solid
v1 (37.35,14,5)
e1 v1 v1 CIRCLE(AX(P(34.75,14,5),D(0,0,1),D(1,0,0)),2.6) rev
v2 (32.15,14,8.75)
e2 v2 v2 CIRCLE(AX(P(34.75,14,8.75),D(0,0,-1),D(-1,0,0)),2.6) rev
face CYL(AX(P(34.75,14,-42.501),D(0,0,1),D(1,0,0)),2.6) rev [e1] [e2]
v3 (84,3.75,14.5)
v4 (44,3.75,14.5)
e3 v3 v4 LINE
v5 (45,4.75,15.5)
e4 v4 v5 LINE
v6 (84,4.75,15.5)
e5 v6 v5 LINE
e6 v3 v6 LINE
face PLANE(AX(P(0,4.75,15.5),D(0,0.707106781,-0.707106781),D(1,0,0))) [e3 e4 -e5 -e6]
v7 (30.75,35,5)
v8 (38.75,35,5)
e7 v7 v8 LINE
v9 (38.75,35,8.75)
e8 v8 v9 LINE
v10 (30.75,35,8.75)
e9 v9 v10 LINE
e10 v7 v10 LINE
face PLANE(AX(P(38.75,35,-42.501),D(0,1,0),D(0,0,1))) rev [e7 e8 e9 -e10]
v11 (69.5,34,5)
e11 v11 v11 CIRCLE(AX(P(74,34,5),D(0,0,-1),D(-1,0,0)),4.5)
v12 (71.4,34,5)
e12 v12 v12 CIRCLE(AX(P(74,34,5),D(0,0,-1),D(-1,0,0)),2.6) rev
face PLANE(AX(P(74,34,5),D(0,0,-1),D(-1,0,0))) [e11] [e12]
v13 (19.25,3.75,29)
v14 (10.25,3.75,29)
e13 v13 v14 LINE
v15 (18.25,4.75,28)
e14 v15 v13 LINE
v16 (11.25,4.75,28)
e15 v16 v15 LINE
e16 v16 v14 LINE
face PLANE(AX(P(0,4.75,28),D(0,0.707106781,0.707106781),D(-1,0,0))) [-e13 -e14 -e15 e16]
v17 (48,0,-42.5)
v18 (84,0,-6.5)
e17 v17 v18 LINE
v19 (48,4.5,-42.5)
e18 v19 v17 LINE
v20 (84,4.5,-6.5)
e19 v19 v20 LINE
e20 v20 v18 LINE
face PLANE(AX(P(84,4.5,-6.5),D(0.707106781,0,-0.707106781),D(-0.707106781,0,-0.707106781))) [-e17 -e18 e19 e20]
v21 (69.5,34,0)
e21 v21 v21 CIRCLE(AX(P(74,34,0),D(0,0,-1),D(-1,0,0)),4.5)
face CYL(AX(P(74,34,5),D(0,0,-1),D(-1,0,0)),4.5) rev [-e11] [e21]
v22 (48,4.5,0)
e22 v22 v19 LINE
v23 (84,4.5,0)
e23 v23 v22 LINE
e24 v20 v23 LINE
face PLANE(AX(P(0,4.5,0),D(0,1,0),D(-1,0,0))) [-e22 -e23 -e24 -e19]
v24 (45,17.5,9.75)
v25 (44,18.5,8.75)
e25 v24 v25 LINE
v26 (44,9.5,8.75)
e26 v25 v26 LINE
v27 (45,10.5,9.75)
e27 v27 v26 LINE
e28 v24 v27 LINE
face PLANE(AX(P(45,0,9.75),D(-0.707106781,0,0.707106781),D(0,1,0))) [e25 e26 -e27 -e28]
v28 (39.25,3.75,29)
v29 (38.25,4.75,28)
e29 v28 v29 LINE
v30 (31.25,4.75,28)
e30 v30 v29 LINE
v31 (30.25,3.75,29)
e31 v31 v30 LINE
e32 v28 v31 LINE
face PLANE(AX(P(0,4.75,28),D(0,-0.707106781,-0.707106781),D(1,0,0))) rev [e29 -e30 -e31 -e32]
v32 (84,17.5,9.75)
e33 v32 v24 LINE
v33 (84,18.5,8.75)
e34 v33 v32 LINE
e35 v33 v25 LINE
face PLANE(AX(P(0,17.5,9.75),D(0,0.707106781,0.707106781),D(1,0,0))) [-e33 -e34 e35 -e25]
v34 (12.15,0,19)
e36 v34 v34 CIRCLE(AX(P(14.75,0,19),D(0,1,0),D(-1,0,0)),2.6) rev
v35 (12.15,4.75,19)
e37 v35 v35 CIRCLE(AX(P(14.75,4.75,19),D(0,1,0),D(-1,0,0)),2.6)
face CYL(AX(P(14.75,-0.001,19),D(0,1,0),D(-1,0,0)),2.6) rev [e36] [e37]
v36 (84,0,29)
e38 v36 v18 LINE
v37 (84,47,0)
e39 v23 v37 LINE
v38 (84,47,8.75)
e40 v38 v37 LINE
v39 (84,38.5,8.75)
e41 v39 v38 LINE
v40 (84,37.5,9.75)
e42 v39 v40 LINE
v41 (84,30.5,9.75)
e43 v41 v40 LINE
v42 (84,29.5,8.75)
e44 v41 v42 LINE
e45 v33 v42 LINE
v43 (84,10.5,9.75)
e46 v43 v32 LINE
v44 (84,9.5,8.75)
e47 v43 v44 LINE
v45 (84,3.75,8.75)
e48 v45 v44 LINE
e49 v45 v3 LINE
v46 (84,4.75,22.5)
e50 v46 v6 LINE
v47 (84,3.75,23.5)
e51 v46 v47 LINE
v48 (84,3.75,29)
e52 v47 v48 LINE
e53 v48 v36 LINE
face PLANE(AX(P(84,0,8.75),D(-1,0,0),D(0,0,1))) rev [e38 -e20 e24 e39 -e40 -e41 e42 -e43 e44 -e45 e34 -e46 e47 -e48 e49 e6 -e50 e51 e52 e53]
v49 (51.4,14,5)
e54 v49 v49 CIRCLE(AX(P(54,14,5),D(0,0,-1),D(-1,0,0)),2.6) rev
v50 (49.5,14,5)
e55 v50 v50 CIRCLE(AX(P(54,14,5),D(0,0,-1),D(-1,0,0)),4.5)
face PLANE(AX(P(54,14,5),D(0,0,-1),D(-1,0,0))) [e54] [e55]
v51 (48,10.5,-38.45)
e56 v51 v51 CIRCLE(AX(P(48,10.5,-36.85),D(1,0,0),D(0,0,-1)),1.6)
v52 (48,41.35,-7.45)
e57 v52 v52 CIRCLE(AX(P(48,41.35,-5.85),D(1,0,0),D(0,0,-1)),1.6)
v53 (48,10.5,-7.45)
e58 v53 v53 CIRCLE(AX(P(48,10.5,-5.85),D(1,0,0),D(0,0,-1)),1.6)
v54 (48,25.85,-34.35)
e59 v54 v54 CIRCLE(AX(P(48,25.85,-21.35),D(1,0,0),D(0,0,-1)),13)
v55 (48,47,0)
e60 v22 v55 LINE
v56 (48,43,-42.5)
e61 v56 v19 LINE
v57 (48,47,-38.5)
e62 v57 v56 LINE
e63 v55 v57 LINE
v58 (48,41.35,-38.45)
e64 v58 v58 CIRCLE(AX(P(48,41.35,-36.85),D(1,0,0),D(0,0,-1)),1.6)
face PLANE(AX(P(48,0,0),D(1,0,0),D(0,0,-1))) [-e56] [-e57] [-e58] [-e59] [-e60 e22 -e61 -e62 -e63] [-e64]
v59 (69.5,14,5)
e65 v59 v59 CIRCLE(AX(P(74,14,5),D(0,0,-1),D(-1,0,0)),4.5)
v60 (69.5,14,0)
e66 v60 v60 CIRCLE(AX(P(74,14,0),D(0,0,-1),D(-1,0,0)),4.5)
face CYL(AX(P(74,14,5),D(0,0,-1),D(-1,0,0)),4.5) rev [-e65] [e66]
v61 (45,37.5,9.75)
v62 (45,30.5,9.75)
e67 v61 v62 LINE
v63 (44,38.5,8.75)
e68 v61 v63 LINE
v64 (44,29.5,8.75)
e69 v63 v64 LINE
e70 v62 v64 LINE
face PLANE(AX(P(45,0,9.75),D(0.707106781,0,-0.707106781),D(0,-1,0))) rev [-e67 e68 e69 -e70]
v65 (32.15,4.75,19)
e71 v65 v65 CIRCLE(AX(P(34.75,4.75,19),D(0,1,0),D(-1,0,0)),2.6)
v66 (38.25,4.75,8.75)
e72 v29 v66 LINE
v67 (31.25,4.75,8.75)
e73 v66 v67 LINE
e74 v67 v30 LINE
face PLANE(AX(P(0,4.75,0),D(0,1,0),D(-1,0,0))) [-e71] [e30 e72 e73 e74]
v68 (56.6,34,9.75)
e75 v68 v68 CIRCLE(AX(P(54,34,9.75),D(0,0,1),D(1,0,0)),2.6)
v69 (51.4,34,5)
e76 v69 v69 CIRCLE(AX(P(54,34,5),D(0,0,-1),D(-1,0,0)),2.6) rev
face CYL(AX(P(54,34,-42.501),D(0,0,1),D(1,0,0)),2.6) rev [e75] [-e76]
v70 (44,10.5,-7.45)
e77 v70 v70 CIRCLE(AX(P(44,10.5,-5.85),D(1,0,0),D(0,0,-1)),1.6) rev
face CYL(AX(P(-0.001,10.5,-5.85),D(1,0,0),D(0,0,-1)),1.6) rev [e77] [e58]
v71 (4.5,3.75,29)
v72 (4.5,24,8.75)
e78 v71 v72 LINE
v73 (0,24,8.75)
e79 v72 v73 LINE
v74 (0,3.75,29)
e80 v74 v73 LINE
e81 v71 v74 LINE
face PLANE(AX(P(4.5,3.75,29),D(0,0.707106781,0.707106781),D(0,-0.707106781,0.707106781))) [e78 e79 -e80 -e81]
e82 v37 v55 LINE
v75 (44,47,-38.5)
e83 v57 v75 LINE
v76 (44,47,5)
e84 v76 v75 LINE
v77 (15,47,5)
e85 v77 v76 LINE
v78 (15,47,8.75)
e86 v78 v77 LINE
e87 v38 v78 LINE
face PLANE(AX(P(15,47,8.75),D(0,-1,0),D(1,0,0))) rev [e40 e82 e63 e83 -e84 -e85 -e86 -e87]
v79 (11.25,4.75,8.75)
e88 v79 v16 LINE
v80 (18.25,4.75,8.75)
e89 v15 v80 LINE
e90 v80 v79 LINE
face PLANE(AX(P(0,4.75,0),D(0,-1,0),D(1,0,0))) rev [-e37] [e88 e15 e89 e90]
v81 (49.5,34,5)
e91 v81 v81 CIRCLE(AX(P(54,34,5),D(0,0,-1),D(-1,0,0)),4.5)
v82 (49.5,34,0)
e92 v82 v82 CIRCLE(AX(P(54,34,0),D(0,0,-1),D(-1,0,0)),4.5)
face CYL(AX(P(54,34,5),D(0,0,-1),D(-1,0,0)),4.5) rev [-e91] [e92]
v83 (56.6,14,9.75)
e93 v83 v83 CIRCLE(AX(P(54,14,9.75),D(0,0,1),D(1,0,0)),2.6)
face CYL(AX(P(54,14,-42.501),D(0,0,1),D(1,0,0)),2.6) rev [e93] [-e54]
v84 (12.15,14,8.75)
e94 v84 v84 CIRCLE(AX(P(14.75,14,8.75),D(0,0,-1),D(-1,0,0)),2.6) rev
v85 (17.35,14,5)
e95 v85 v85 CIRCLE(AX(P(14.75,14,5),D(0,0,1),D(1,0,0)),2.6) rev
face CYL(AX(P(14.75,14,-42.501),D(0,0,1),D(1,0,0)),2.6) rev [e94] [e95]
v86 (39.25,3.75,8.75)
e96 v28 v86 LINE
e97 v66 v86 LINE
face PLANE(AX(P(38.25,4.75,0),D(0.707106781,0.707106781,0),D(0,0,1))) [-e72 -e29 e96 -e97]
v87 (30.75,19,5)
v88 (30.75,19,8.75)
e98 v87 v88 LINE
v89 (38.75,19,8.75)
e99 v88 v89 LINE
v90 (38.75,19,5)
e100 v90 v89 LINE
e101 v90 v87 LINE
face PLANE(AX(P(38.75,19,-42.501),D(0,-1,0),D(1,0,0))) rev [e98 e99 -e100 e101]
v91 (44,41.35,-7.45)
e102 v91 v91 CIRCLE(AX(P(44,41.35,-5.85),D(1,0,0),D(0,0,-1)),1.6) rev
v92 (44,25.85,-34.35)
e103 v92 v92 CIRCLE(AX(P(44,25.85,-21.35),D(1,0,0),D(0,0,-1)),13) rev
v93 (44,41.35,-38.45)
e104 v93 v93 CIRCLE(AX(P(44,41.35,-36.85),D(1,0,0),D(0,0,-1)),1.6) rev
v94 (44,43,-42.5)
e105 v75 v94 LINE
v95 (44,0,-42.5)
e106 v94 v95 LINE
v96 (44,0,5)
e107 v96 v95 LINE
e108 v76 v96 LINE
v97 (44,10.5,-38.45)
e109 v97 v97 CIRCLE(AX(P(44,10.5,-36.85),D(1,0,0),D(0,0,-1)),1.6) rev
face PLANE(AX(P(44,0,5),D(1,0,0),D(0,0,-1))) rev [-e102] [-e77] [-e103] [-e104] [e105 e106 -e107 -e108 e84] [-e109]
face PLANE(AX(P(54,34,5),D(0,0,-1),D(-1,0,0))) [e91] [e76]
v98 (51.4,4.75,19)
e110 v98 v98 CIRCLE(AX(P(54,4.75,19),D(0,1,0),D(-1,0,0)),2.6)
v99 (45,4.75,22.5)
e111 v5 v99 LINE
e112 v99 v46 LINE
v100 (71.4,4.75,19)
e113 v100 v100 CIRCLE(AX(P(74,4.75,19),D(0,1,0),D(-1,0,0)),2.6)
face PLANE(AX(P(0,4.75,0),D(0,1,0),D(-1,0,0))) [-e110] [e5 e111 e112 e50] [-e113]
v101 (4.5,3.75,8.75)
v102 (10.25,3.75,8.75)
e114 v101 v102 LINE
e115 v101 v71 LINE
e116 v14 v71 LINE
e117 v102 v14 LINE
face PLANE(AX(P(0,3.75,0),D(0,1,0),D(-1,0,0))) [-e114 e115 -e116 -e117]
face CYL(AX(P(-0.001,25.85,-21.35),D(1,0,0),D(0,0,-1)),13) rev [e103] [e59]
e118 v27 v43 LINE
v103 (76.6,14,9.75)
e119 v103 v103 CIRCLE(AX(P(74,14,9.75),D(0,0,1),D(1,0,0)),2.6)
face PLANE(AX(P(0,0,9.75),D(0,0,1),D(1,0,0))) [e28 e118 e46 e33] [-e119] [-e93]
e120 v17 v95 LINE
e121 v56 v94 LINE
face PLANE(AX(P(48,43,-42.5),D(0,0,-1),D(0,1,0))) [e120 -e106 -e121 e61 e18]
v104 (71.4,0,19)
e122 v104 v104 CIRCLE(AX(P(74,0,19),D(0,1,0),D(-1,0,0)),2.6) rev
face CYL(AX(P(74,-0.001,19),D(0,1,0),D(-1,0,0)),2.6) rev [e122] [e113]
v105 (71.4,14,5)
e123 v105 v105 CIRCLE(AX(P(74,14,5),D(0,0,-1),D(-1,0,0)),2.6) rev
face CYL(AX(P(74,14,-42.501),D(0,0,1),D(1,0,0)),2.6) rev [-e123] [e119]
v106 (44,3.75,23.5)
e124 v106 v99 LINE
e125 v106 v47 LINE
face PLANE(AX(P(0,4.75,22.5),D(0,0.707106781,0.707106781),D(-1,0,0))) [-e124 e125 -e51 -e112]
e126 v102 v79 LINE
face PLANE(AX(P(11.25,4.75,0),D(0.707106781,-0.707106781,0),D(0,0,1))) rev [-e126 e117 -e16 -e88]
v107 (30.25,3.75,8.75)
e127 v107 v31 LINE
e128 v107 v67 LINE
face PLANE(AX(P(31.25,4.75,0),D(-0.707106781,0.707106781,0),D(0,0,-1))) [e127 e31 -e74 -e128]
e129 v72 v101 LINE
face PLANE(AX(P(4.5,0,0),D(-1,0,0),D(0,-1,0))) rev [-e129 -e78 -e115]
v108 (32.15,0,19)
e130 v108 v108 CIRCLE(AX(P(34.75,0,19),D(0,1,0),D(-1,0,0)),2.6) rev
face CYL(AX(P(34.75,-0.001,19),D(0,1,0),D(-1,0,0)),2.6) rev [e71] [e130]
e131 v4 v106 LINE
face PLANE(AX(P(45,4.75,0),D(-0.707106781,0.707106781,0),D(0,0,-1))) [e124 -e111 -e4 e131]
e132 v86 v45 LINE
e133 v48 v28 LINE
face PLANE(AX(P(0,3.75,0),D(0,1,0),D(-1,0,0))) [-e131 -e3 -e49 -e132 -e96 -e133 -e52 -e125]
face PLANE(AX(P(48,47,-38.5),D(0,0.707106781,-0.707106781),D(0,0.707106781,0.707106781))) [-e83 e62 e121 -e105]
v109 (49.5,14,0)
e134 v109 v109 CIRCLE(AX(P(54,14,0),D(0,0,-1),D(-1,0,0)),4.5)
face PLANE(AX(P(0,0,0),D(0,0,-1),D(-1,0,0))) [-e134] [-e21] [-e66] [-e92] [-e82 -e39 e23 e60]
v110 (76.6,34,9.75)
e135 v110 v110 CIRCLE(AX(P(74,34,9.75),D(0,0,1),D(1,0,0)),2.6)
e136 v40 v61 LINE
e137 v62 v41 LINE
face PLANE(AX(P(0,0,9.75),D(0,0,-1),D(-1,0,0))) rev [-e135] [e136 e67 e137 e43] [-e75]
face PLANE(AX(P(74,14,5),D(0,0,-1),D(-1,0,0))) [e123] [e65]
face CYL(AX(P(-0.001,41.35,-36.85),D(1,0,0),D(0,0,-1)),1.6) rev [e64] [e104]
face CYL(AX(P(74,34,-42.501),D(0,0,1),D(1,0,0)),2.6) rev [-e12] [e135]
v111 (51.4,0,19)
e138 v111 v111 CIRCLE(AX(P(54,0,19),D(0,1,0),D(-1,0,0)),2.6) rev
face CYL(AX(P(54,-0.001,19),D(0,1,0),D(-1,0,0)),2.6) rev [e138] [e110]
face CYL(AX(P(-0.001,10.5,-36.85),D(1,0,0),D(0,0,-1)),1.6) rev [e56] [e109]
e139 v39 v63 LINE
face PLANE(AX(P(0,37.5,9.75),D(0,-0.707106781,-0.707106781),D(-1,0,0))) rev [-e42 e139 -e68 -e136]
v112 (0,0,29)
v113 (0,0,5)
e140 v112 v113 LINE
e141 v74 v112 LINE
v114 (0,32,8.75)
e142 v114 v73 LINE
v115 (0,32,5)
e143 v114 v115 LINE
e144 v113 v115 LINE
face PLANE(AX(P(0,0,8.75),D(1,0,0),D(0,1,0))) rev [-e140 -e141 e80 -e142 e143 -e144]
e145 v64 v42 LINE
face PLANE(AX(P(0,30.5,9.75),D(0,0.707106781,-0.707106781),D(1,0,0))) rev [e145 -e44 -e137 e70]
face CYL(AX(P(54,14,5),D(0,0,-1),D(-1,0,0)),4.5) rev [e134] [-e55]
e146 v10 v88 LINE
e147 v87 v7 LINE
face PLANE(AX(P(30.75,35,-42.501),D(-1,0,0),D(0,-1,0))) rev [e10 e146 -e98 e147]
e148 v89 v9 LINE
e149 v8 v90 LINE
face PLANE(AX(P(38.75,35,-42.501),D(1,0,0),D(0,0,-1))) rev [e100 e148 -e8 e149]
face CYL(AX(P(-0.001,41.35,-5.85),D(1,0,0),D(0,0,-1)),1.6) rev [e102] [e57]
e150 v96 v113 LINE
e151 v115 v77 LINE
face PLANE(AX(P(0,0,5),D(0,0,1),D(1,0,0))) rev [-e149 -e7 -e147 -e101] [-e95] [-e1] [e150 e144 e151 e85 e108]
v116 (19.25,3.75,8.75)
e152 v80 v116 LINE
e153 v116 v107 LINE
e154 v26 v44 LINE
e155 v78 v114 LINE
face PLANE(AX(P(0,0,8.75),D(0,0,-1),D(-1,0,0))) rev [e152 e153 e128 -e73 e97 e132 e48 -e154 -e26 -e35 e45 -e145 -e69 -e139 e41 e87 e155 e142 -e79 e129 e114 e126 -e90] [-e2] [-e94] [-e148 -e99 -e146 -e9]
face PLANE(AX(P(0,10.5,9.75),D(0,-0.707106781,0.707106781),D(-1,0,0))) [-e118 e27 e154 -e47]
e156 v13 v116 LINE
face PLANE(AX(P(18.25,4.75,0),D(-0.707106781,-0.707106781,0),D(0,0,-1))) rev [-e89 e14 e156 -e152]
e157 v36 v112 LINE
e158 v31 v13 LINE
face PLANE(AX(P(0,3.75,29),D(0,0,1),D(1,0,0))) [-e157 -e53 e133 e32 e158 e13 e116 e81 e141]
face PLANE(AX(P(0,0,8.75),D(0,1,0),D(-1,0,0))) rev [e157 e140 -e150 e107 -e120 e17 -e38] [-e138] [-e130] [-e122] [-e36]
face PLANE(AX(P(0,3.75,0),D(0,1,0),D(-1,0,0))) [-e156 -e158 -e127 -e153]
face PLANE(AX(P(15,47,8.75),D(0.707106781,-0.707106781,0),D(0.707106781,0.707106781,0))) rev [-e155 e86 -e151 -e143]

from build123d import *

# Parameters (mm, degrees)
BOSS_EXTRUDE1_DEPTH = 8.75
CUT_EXTRUDE1_DEPTH  = 5
BOSS_EXTRUDE2_DEPTH = 4
BOSS_EXTRUDE3_DEPTH = 4.5
SKETCH5_W           = 84
SKETCH5_H           = 20.25
BOSS_EXTRUDE4_DEPTH = 3.75
BOSS_EXTRUDE5_DEPTH = 4.5
SKETCH7_W           = 40
SKETCH7_H           = 9
SKETCH7_W_2         = 9
SKETCH7_H_2         = 20.25
BOSS_EXTRUDE6_DEPTH = 1
SKETCH8_W           = 40
SKETCH8_H           = 9
BOSS_EXTRUDE7_DEPTH = 1
CHAMFER1_SIZE       = 1
CUT_EXTRUDE2_REACH  = 105.186
SKETCH9_R           = 2.6
CUT_EXTRUDE3_REACH  = 111.522
SKETCH10_R          = 2.6
SKETCH10_W          = 8
SKETCH10_H          = 16
SKETCH12_R          = 4.5
CUT_EXTRUDE4_DEPTH  = 5
CUT_EXTRUDE5_REACH  = 81.494
SKETCH13_R          = 1.6
SKETCH13_R_2        = 13


with BuildPart() as part:
    # Sketch1 → Boss-Extrude1 (new body)
    with BuildSketch(Plane.XY):
        Polygon((0, 0), (84, 0), (84, 47), (15, 47), (0, 32), align=None)
    extrude(amount=BOSS_EXTRUDE1_DEPTH)

    # Sketch2 → Cut-Extrude1 (cut)
    with BuildSketch(Plane(origin=(0, 0, 0), x_dir=(-1, 0, 0), z_dir=(0, 0, -1))):
        Polygon((0, 0), (-44, 0), (-44, 47), (-15, 47), (0, 32), align=None)
    extrude(amount=-CUT_EXTRUDE1_DEPTH, mode=Mode.SUBTRACT)

    # Sketch3 → Boss-Extrude2 (add)
    with BuildSketch(Plane.ZY.offset(-44)):
        Polygon((0, 47), (-38.5, 47), (-42.5, 43), (-42.5, 0), (0, 0), align=None)
    extrude(amount=-BOSS_EXTRUDE2_DEPTH)

    # Sketch4 → Boss-Extrude3 (add)
    with BuildSketch(Plane.XZ):
        Polygon((48, 0), (84, 0), (84, -6.5), (48, -42.5), align=None)
    extrude(amount=-BOSS_EXTRUDE3_DEPTH)

    # Sketch5 → Boss-Extrude4 (add)
    with BuildSketch(Plane.XZ):
        with Locations((42, 18.875)):
            Rectangle(SKETCH5_W, SKETCH5_H)
    extrude(amount=-BOSS_EXTRUDE4_DEPTH)

    # Sketch6 → Boss-Extrude5 (add)
    with BuildSketch(Plane.ZY):
        Polygon((8.75, 3.75), (29, 3.75), (8.75, 24), align=None)
    extrude(amount=-BOSS_EXTRUDE5_DEPTH)

    # Sketch7 → Boss-Extrude6 (add)
    with BuildSketch(Plane(origin=(0, 3.75, 0), x_dir=(1, 0, 0), z_dir=(0, 1, 0))):
        with Locations((64, -19)):
            Rectangle(SKETCH7_W, SKETCH7_H)
        with Locations((14.75, -18.875)):
            Rectangle(SKETCH7_W_2, SKETCH7_H_2)
        with Locations((34.75, -18.875)):
            Rectangle(SKETCH7_W_2, SKETCH7_H_2)
    extrude(amount=BOSS_EXTRUDE6_DEPTH)

    # Sketch8 → Boss-Extrude7 (add)
    with BuildSketch(Plane.XY.offset(8.75)):
        with Locations((64, 14)):
            Rectangle(SKETCH8_W, SKETCH8_H)
        with Locations((64, 34)):
            Rectangle(SKETCH8_W, SKETCH8_H)
    extrude(amount=BOSS_EXTRUDE7_DEPTH)

    # Chamfer1
    chamfer1_edges = [part.edges().sort_by_distance(p)[0] for p in [
        (19.25, 4.75, 18.875),
        (14.75, 4.75, 29),
        (10.25, 4.75, 18.875),
        (30.25, 4.75, 18.875),
        (34.75, 4.75, 29),
        (39.25, 4.75, 18.875),
        (64, 4.75, 14.5),
        (64, 4.75, 23.5),
        (44, 4.75, 19),
        (64, 29.5, 9.75),
        (44, 34, 9.75),
        (64, 38.5, 9.75),
        (64, 9.5, 9.75),
        (64, 18.5, 9.75),
        (44, 14, 9.75),
    ]]
    chamfer(chamfer1_edges, length=CHAMFER1_SIZE - 0.0001)  # a hair under: the kernel refuses the full size

    # Sketch9 → Cut-Extrude2 (cut, up to next)
    with BuildSketch(Plane(origin=(0, 4.75, 0), x_dir=(1, 0, 0), z_dir=(0, 1, 0)), mode=Mode.PRIVATE) as cut_extrude2_sk1:
        with Locations(Location((14.75, -19, 0), (0, 0, 180))):
            Circle(SKETCH9_R)
    cut_extrude2_tool1 = extrude(cut_extrude2_sk1.sketch, amount=-CUT_EXTRUDE2_REACH, mode=Mode.PRIVATE) & part.part
    # Sketch9 → Cut-Extrude2 (cut, up to next)
    with BuildSketch(Plane(origin=(0, 4.75, 0), x_dir=(1, 0, 0), z_dir=(0, 1, 0)), mode=Mode.PRIVATE) as cut_extrude2_sk2:
        with Locations(Location((34.75, -19, 0), (0, 0, 180))):
            Circle(SKETCH9_R)
    cut_extrude2_tool2 = extrude(cut_extrude2_sk2.sketch, amount=-CUT_EXTRUDE2_REACH, mode=Mode.PRIVATE) & part.part
    # Sketch9 → Cut-Extrude2 (cut, up to next)
    with BuildSketch(Plane(origin=(0, 4.75, 0), x_dir=(1, 0, 0), z_dir=(0, 1, 0)), mode=Mode.PRIVATE) as cut_extrude2_sk3:
        with Locations(Location((54, -19, 0), (0, 0, 180))):
            Circle(SKETCH9_R)
    cut_extrude2_tool3 = extrude(cut_extrude2_sk3.sketch, amount=-CUT_EXTRUDE2_REACH, mode=Mode.PRIVATE) & part.part
    # Sketch9 → Cut-Extrude2 (cut, up to next)
    with BuildSketch(Plane(origin=(0, 4.75, 0), x_dir=(1, 0, 0), z_dir=(0, 1, 0)), mode=Mode.PRIVATE) as cut_extrude2_sk4:
        with Locations(Location((74, -19, 0), (0, 0, 180))):
            Circle(SKETCH9_R)
    cut_extrude2_tool4 = extrude(cut_extrude2_sk4.sketch, amount=-CUT_EXTRUDE2_REACH, mode=Mode.PRIVATE) & part.part
    add(cut_extrude2_tool1.solids().sort_by_distance((14.75, 4.75, 19))[0], mode=Mode.SUBTRACT)
    add(cut_extrude2_tool2.solids().sort_by_distance((34.75, 4.75, 19))[0], mode=Mode.SUBTRACT)
    add(cut_extrude2_tool3.solids().sort_by_distance((54, 4.75, 19))[0], mode=Mode.SUBTRACT)
    add(cut_extrude2_tool4.solids().sort_by_distance((74, 4.75, 19))[0], mode=Mode.SUBTRACT)

    # Sketch10 → Cut-Extrude3 (cut, up to next)
    with BuildSketch(Plane.XY.offset(9.75), mode=Mode.PRIVATE) as cut_extrude3_sk1:
        with Locations((54, 34)):
            Circle(SKETCH10_R)
    cut_extrude3_tool1 = extrude(cut_extrude3_sk1.sketch, amount=-CUT_EXTRUDE3_REACH, mode=Mode.PRIVATE) & part.part
    # Sketch10 → Cut-Extrude3 (cut, up to next)
    with BuildSketch(Plane.XY.offset(9.75), mode=Mode.PRIVATE) as cut_extrude3_sk2:
        with Locations((74, 34)):
            Circle(SKETCH10_R)
    cut_extrude3_tool2 = extrude(cut_extrude3_sk2.sketch, amount=-CUT_EXTRUDE3_REACH, mode=Mode.PRIVATE) & part.part
    # Sketch10 → Cut-Extrude3 (cut, up to next)
    with BuildSketch(Plane.XY.offset(9.75), mode=Mode.PRIVATE) as cut_extrude3_sk3:
        with Locations((54, 14)):
            Circle(SKETCH10_R)
    cut_extrude3_tool3 = extrude(cut_extrude3_sk3.sketch, amount=-CUT_EXTRUDE3_REACH, mode=Mode.PRIVATE) & part.part
    # Sketch10 → Cut-Extrude3 (cut, up to next)
    with BuildSketch(Plane.XY.offset(9.75), mode=Mode.PRIVATE) as cut_extrude3_sk4:
        with Locations((74, 14)):
            Circle(SKETCH10_R)
    cut_extrude3_tool4 = extrude(cut_extrude3_sk4.sketch, amount=-CUT_EXTRUDE3_REACH, mode=Mode.PRIVATE) & part.part
    # Sketch10 → Cut-Extrude3 (cut, up to next)
    with BuildSketch(Plane.XY.offset(9.75), mode=Mode.PRIVATE) as cut_extrude3_sk5:
        with Locations((34.75, 14)):
            Circle(SKETCH10_R)
    cut_extrude3_tool5 = extrude(cut_extrude3_sk5.sketch, amount=-CUT_EXTRUDE3_REACH, mode=Mode.PRIVATE) & part.part
    # Sketch10 → Cut-Extrude3 (cut, up to next)
    with BuildSketch(Plane.XY.offset(9.75), mode=Mode.PRIVATE) as cut_extrude3_sk6:
        with Locations((14.75, 14)):
            Circle(SKETCH10_R)
    cut_extrude3_tool6 = extrude(cut_extrude3_sk6.sketch, amount=-CUT_EXTRUDE3_REACH, mode=Mode.PRIVATE) & part.part
    # Sketch10 → Cut-Extrude3 (cut, up to next)
    with BuildSketch(Plane.XY.offset(9.75), mode=Mode.PRIVATE) as cut_extrude3_sk7:
        with Locations((34.75, 27)):
            Rectangle(SKETCH10_W, SKETCH10_H)
    cut_extrude3_tool7 = extrude(cut_extrude3_sk7.sketch, amount=-CUT_EXTRUDE3_REACH, mode=Mode.PRIVATE) & part.part
    add(cut_extrude3_tool1.solids().sort_by_distance((54, 34, 9.75))[0], mode=Mode.SUBTRACT)
    add(cut_extrude3_tool2.solids().sort_by_distance((74, 34, 9.75))[0], mode=Mode.SUBTRACT)
    add(cut_extrude3_tool3.solids().sort_by_distance((54, 14, 9.75))[0], mode=Mode.SUBTRACT)
    add(cut_extrude3_tool4.solids().sort_by_distance((74, 14, 9.75))[0], mode=Mode.SUBTRACT)
    add(cut_extrude3_tool5.solids().sort_by_distance((34.75, 14, 9.75))[0], mode=Mode.SUBTRACT)
    add(cut_extrude3_tool6.solids().sort_by_distance((14.75, 14, 9.75))[0], mode=Mode.SUBTRACT)
    add(cut_extrude3_tool7.solids().sort_by_distance((34.75, 27, 9.75))[0], mode=Mode.SUBTRACT)

    # Sketch12 → Cut-Extrude4 (cut)
    with BuildSketch(Plane(origin=(0, 0, 0), x_dir=(-1, 0, 0), z_dir=(0, 0, -1))):
        with Locations((-54, 34)):
            Circle(SKETCH12_R)
        with Locations((-74, 34)):
            Circle(SKETCH12_R)
        with Locations((-74, 14)):
            Circle(SKETCH12_R)
        with Locations((-54, 14)):
            Circle(SKETCH12_R)
    extrude(amount=-CUT_EXTRUDE4_DEPTH, mode=Mode.SUBTRACT)

    # Sketch13 → Cut-Extrude5 (cut, up to next)
    with BuildSketch(Plane(origin=(48, 0, 0), x_dir=(0, 0, -1), z_dir=(1, 0, 0)), mode=Mode.PRIVATE) as cut_extrude5_sk1:
        with Locations((5.85, 41.35)):
            Circle(SKETCH13_R)
    cut_extrude5_tool1 = extrude(cut_extrude5_sk1.sketch, amount=-CUT_EXTRUDE5_REACH, mode=Mode.PRIVATE) & part.part
    # Sketch13 → Cut-Extrude5 (cut, up to next)
    with BuildSketch(Plane(origin=(48, 0, 0), x_dir=(0, 0, -1), z_dir=(1, 0, 0)), mode=Mode.PRIVATE) as cut_extrude5_sk2:
        with Locations((36.85, 41.35)):
            Circle(SKETCH13_R)
    cut_extrude5_tool2 = extrude(cut_extrude5_sk2.sketch, amount=-CUT_EXTRUDE5_REACH, mode=Mode.PRIVATE) & part.part
    # Sketch13 → Cut-Extrude5 (cut, up to next)
    with BuildSketch(Plane(origin=(48, 0, 0), x_dir=(0, 0, -1), z_dir=(1, 0, 0)), mode=Mode.PRIVATE) as cut_extrude5_sk3:
        with Locations((36.85, 10.5)):
            Circle(SKETCH13_R)
    cut_extrude5_tool3 = extrude(cut_extrude5_sk3.sketch, amount=-CUT_EXTRUDE5_REACH, mode=Mode.PRIVATE) & part.part
    # Sketch13 → Cut-Extrude5 (cut, up to next)
    with BuildSketch(Plane(origin=(48, 0, 0), x_dir=(0, 0, -1), z_dir=(1, 0, 0)), mode=Mode.PRIVATE) as cut_extrude5_sk4:
        with Locations((5.85, 10.5)):
            Circle(SKETCH13_R)
    cut_extrude5_tool4 = extrude(cut_extrude5_sk4.sketch, amount=-CUT_EXTRUDE5_REACH, mode=Mode.PRIVATE) & part.part
    # Sketch13 → Cut-Extrude5 (cut, up to next)
    with BuildSketch(Plane(origin=(48, 0, 0), x_dir=(0, 0, -1), z_dir=(1, 0, 0)), mode=Mode.PRIVATE) as cut_extrude5_sk5:
        with Locations((21.35, 25.85)):
            Circle(SKETCH13_R_2)
    cut_extrude5_tool5 = extrude(cut_extrude5_sk5.sketch, amount=-CUT_EXTRUDE5_REACH, mode=Mode.PRIVATE) & part.part
    add(cut_extrude5_tool1.solids().sort_by_distance((48, 41.35, -5.85))[0], mode=Mode.SUBTRACT)
    add(cut_extrude5_tool2.solids().sort_by_distance((48, 41.35, -36.85))[0], mode=Mode.SUBTRACT)
    add(cut_extrude5_tool3.solids().sort_by_distance((48, 10.5, -36.85))[0], mode=Mode.SUBTRACT)
    add(cut_extrude5_tool4.solids().sort_by_distance((48, 10.5, -5.85))[0], mode=Mode.SUBTRACT)
    add(cut_extrude5_tool5.solids().sort_by_distance((48, 25.85, -21.35))[0], mode=Mode.SUBTRACT)


solid = part.part
